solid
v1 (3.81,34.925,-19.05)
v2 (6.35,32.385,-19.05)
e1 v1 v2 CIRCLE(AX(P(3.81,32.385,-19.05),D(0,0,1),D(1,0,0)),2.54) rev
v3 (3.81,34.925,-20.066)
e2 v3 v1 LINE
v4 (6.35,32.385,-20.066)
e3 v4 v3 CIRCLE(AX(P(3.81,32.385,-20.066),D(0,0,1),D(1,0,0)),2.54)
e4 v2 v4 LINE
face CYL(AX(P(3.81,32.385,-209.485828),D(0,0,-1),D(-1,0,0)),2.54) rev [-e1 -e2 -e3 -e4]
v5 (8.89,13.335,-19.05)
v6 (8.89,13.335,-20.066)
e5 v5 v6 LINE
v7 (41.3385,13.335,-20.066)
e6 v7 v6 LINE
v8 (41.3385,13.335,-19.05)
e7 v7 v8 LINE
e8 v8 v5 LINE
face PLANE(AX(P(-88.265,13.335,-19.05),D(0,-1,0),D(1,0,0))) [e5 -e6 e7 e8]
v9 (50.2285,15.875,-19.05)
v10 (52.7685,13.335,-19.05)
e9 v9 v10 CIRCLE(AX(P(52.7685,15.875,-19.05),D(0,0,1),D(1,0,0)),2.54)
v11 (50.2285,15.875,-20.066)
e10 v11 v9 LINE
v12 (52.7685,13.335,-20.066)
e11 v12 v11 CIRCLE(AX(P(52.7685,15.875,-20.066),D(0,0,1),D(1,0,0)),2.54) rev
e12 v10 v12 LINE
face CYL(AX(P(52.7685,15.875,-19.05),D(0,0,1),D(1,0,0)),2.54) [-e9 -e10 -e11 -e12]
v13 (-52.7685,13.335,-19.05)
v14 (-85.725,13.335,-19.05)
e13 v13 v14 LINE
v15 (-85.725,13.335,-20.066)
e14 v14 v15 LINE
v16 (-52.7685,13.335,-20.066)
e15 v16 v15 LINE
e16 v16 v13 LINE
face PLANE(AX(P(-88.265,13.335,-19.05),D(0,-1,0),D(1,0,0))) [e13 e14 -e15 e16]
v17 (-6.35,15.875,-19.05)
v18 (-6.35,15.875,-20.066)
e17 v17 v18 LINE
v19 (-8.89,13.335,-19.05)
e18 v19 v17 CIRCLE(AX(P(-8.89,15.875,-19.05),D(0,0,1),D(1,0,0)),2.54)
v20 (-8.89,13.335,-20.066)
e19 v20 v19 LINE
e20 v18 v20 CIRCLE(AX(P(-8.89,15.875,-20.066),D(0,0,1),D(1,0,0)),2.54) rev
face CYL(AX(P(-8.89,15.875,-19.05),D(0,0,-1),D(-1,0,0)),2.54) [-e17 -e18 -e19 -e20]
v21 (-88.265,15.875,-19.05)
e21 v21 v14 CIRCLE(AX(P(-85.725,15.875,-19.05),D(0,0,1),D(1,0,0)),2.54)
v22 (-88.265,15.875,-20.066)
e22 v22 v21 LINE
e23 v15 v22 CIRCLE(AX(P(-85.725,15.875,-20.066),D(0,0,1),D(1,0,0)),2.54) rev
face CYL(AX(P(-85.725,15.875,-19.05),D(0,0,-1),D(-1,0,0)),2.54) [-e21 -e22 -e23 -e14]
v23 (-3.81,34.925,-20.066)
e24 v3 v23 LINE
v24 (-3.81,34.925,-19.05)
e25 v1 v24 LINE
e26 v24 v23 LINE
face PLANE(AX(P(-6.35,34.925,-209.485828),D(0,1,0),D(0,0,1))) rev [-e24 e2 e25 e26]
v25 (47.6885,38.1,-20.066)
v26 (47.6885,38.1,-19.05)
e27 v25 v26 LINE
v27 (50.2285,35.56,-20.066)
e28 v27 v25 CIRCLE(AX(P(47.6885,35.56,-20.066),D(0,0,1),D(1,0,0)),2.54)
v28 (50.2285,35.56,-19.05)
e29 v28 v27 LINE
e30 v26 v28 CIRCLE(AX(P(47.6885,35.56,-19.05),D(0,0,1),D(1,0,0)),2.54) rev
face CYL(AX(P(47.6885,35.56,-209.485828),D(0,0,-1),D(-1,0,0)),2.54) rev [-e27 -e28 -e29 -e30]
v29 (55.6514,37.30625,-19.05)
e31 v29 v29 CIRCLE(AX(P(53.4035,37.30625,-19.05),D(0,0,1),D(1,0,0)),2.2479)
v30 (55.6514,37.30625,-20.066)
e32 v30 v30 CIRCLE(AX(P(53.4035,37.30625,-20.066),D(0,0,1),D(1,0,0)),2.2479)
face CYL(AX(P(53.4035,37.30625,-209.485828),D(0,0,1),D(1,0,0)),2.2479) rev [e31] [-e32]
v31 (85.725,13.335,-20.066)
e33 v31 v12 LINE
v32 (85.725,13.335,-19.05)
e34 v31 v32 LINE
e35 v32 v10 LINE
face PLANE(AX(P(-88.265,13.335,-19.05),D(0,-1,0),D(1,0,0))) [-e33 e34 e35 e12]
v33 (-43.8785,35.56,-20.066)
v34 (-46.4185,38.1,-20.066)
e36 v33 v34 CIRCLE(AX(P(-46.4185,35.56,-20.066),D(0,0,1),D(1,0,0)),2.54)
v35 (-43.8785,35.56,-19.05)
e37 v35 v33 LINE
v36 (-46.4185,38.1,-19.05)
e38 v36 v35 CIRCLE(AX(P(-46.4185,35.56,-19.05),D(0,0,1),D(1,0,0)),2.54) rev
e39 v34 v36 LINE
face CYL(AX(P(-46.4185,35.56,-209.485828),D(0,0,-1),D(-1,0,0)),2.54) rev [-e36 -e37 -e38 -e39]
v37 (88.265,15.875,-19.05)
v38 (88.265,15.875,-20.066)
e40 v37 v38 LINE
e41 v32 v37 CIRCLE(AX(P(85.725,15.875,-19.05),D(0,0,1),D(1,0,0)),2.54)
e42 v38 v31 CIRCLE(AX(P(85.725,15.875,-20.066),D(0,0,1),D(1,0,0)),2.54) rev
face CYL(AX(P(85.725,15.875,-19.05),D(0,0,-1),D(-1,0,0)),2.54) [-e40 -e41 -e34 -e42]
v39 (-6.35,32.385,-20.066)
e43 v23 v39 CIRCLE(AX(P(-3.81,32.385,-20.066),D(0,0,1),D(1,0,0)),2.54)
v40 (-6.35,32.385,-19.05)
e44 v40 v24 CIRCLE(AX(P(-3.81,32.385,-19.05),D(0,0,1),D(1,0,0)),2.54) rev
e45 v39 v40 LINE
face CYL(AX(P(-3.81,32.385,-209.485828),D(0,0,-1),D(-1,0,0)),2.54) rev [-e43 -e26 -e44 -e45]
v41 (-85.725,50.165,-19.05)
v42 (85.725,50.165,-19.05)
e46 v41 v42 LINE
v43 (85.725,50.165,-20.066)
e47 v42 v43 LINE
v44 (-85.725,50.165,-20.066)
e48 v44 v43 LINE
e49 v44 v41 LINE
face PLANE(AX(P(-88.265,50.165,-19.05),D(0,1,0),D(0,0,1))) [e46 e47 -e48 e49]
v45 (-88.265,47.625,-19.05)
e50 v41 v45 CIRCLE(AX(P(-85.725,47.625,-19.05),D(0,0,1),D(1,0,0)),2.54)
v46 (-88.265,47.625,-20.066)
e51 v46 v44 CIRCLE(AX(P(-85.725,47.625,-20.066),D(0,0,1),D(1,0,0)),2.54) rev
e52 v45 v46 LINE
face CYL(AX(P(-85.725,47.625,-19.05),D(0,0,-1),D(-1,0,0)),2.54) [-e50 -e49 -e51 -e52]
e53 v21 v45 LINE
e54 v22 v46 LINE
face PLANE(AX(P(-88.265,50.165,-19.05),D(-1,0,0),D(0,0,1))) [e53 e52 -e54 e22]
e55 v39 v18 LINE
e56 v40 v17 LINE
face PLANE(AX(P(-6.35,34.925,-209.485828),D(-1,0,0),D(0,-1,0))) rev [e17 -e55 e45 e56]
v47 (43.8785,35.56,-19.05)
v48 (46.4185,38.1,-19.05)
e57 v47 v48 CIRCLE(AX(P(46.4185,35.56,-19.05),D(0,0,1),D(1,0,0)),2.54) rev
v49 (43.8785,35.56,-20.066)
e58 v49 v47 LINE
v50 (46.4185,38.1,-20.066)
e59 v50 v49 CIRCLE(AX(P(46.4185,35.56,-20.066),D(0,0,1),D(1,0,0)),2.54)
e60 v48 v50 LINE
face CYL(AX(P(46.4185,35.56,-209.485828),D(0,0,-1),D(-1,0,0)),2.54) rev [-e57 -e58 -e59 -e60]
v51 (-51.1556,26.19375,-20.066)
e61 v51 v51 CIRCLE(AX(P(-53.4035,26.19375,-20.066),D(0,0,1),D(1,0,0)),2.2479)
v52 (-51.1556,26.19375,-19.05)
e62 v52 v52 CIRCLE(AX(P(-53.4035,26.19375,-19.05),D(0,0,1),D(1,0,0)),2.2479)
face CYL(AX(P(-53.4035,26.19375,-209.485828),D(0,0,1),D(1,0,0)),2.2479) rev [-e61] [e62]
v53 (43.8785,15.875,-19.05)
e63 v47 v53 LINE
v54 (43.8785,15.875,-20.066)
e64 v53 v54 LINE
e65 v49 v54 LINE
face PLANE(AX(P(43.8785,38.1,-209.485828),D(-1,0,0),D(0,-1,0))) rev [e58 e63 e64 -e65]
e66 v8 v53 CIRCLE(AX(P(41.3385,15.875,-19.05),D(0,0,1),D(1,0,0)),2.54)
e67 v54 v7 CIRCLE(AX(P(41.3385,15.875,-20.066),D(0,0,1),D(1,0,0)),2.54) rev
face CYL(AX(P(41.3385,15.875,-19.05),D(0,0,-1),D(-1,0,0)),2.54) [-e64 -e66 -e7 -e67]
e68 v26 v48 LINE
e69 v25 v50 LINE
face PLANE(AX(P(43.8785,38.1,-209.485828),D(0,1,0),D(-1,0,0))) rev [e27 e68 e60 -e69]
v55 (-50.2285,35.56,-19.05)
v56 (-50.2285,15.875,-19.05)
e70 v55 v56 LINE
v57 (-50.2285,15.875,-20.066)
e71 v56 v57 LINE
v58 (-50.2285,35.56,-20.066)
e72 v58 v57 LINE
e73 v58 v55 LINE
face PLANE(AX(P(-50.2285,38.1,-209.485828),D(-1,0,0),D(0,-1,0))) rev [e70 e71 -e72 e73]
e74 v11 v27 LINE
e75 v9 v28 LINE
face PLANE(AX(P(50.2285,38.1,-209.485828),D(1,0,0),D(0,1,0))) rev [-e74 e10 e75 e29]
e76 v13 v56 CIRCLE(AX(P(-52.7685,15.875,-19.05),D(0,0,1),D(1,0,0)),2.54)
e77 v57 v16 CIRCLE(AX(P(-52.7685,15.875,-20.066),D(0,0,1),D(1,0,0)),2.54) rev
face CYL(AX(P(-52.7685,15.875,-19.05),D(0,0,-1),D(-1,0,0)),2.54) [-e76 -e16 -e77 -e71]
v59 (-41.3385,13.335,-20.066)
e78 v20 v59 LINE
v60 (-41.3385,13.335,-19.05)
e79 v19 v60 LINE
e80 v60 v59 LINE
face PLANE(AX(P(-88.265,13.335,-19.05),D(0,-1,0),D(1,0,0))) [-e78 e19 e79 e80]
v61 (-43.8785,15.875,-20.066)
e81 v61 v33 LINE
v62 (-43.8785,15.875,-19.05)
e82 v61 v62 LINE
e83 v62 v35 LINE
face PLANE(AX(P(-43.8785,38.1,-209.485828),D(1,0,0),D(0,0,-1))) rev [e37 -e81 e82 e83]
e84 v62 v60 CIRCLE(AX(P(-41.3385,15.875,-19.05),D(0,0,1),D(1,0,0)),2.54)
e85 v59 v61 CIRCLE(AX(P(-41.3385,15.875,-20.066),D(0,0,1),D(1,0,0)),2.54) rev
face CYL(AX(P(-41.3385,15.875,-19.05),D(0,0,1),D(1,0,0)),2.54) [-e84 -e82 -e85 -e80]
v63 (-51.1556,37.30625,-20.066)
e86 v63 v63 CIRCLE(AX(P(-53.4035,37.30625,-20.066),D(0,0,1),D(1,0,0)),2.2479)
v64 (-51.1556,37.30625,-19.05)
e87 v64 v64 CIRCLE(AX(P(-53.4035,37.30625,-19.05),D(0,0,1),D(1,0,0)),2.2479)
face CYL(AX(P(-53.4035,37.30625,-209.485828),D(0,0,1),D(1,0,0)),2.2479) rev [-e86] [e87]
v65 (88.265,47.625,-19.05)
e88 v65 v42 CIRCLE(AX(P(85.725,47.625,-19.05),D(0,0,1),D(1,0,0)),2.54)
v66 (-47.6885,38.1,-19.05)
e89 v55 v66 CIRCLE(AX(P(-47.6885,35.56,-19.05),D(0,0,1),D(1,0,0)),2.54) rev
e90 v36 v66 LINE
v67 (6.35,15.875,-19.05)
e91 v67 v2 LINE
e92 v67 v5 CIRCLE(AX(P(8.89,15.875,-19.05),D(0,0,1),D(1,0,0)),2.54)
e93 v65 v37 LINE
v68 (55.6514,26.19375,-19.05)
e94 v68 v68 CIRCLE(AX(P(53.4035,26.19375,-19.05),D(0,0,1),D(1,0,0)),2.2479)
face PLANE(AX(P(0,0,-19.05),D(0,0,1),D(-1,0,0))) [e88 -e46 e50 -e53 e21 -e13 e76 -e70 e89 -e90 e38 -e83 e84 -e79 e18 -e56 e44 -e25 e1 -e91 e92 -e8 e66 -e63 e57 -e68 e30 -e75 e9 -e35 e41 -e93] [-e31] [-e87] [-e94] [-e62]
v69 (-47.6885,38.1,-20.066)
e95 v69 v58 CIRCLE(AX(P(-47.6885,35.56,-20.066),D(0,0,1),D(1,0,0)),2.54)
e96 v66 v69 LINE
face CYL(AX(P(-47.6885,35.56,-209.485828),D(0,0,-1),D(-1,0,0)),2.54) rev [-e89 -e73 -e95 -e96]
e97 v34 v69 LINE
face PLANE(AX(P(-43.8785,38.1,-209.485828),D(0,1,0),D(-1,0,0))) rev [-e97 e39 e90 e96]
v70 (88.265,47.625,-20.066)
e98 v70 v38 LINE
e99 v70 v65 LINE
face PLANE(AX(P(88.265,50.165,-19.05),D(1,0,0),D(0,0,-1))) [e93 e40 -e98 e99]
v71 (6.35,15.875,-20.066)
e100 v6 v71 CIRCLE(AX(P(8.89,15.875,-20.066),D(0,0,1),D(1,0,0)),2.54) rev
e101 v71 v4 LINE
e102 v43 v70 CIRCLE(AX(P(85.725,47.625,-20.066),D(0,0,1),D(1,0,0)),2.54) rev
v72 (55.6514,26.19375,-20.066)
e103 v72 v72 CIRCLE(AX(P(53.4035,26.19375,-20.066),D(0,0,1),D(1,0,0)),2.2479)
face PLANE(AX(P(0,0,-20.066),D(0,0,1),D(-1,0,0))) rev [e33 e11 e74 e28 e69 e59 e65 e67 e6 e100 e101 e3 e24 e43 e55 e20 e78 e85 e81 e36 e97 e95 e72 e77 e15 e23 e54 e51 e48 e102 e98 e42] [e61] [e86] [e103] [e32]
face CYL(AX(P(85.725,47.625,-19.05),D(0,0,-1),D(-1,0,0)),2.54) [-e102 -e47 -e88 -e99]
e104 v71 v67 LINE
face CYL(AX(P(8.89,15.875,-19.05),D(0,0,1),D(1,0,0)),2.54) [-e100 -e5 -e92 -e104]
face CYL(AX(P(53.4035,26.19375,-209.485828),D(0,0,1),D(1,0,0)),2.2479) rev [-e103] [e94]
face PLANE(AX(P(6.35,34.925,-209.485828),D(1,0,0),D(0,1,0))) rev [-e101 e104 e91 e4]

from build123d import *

# Parameters (mm, degrees)
STOCK_HAMMERSAW_START                 = -20.066
STOCK_HAMMERSAW_MULTIBODY_1_OUTLINE_R = 2.2479
STOCK_HAMMERSAW_MULTIBODY_1_DEPTH     = 1.016
SKETCH1_W                             = 177.8
SKETCH1_H                             = 38.1
SKETCH1_W_2                           = 176.53
SKETCH1_H_2                           = 36.83
CUT_EXTRUDE1_DEPTH                    = 103.395714051
FILLET1_R                             = 2.54


# Read off the part's stored shape, not the designer's step: Stock-HammerSaw Multibody-1
with BuildPart() as part:
    # Stock-HammerSaw Multibody-1 outline → Stock-HammerSaw Multibody-1 (new body)
    with BuildSketch(Plane.XY.offset(STOCK_HAMMERSAW_START)):
        Polygon((6.35, 12.7), (43.8785, 12.7), (43.8785, 38.1), (50.2285, 38.1), (50.2285, 12.7), (88.9, 12.7), (88.9, 50.8), (-88.9, 50.8), (-88.9, 12.7), (-50.2285, 12.7), (-50.2285, 38.1), (-43.8785, 38.1), (-43.8785, 12.7), (-6.35, 12.7), (-6.35, 34.925), (6.35, 34.925), align=None)
        with Locations((-53.4035, 26.19375)):
            Circle(STOCK_HAMMERSAW_MULTIBODY_1_OUTLINE_R, mode=Mode.SUBTRACT)
        with Locations((53.4035, 26.19375)):
            Circle(STOCK_HAMMERSAW_MULTIBODY_1_OUTLINE_R, mode=Mode.SUBTRACT)
        with Locations((-53.4035, 37.30625)):
            Circle(STOCK_HAMMERSAW_MULTIBODY_1_OUTLINE_R, mode=Mode.SUBTRACT)
        with Locations((53.4035, 37.30625)):
            Circle(STOCK_HAMMERSAW_MULTIBODY_1_OUTLINE_R, mode=Mode.SUBTRACT)
    extrude(amount=STOCK_HAMMERSAW_MULTIBODY_1_DEPTH)

    # Sketch1 → Cut-Extrude1 (cut, through all)
    with BuildSketch(Plane(origin=(0, 0, -20.066), x_dir=(-1, 0, 0), z_dir=(0, 0, -1))):
        with Locations((0, 31.75)):
            Rectangle(SKETCH1_W, SKETCH1_H)
        with Locations((0, 31.75)):
            Rectangle(SKETCH1_W_2, SKETCH1_H_2, mode=Mode.SUBTRACT)
    extrude(amount=-CUT_EXTRUDE1_DEPTH, mode=Mode.SUBTRACT)

    # Fillet1
    fillet1_edges = [part.edges().sort_by_distance(p)[0] for p in [
        (-6.35, 13.335, -19.558),
        (88.265, 13.335, -19.558),
        (50.2285, 13.335, -19.558),
        (43.8785, 13.335, -19.558),
        (-50.2285, 13.335, -19.558),
        (-43.8785, 13.335, -19.558),
        (-88.265, 50.165, -19.558),
        (-88.265, 13.335, -19.558),
        (6.35, 13.335, -19.558),
        (88.265, 50.165, -19.558),
        (6.35, 34.925, -19.558),
        (-6.35, 34.925, -19.558),
        (-50.2285, 38.1, -19.558),
        (-43.8785, 38.1, -19.558),
        (50.2285, 38.1, -19.558),
        (43.8785, 38.1, -19.558),
    ]]
    fillet(fillet1_edges, radius=FILLET1_R)


solid = part.part
